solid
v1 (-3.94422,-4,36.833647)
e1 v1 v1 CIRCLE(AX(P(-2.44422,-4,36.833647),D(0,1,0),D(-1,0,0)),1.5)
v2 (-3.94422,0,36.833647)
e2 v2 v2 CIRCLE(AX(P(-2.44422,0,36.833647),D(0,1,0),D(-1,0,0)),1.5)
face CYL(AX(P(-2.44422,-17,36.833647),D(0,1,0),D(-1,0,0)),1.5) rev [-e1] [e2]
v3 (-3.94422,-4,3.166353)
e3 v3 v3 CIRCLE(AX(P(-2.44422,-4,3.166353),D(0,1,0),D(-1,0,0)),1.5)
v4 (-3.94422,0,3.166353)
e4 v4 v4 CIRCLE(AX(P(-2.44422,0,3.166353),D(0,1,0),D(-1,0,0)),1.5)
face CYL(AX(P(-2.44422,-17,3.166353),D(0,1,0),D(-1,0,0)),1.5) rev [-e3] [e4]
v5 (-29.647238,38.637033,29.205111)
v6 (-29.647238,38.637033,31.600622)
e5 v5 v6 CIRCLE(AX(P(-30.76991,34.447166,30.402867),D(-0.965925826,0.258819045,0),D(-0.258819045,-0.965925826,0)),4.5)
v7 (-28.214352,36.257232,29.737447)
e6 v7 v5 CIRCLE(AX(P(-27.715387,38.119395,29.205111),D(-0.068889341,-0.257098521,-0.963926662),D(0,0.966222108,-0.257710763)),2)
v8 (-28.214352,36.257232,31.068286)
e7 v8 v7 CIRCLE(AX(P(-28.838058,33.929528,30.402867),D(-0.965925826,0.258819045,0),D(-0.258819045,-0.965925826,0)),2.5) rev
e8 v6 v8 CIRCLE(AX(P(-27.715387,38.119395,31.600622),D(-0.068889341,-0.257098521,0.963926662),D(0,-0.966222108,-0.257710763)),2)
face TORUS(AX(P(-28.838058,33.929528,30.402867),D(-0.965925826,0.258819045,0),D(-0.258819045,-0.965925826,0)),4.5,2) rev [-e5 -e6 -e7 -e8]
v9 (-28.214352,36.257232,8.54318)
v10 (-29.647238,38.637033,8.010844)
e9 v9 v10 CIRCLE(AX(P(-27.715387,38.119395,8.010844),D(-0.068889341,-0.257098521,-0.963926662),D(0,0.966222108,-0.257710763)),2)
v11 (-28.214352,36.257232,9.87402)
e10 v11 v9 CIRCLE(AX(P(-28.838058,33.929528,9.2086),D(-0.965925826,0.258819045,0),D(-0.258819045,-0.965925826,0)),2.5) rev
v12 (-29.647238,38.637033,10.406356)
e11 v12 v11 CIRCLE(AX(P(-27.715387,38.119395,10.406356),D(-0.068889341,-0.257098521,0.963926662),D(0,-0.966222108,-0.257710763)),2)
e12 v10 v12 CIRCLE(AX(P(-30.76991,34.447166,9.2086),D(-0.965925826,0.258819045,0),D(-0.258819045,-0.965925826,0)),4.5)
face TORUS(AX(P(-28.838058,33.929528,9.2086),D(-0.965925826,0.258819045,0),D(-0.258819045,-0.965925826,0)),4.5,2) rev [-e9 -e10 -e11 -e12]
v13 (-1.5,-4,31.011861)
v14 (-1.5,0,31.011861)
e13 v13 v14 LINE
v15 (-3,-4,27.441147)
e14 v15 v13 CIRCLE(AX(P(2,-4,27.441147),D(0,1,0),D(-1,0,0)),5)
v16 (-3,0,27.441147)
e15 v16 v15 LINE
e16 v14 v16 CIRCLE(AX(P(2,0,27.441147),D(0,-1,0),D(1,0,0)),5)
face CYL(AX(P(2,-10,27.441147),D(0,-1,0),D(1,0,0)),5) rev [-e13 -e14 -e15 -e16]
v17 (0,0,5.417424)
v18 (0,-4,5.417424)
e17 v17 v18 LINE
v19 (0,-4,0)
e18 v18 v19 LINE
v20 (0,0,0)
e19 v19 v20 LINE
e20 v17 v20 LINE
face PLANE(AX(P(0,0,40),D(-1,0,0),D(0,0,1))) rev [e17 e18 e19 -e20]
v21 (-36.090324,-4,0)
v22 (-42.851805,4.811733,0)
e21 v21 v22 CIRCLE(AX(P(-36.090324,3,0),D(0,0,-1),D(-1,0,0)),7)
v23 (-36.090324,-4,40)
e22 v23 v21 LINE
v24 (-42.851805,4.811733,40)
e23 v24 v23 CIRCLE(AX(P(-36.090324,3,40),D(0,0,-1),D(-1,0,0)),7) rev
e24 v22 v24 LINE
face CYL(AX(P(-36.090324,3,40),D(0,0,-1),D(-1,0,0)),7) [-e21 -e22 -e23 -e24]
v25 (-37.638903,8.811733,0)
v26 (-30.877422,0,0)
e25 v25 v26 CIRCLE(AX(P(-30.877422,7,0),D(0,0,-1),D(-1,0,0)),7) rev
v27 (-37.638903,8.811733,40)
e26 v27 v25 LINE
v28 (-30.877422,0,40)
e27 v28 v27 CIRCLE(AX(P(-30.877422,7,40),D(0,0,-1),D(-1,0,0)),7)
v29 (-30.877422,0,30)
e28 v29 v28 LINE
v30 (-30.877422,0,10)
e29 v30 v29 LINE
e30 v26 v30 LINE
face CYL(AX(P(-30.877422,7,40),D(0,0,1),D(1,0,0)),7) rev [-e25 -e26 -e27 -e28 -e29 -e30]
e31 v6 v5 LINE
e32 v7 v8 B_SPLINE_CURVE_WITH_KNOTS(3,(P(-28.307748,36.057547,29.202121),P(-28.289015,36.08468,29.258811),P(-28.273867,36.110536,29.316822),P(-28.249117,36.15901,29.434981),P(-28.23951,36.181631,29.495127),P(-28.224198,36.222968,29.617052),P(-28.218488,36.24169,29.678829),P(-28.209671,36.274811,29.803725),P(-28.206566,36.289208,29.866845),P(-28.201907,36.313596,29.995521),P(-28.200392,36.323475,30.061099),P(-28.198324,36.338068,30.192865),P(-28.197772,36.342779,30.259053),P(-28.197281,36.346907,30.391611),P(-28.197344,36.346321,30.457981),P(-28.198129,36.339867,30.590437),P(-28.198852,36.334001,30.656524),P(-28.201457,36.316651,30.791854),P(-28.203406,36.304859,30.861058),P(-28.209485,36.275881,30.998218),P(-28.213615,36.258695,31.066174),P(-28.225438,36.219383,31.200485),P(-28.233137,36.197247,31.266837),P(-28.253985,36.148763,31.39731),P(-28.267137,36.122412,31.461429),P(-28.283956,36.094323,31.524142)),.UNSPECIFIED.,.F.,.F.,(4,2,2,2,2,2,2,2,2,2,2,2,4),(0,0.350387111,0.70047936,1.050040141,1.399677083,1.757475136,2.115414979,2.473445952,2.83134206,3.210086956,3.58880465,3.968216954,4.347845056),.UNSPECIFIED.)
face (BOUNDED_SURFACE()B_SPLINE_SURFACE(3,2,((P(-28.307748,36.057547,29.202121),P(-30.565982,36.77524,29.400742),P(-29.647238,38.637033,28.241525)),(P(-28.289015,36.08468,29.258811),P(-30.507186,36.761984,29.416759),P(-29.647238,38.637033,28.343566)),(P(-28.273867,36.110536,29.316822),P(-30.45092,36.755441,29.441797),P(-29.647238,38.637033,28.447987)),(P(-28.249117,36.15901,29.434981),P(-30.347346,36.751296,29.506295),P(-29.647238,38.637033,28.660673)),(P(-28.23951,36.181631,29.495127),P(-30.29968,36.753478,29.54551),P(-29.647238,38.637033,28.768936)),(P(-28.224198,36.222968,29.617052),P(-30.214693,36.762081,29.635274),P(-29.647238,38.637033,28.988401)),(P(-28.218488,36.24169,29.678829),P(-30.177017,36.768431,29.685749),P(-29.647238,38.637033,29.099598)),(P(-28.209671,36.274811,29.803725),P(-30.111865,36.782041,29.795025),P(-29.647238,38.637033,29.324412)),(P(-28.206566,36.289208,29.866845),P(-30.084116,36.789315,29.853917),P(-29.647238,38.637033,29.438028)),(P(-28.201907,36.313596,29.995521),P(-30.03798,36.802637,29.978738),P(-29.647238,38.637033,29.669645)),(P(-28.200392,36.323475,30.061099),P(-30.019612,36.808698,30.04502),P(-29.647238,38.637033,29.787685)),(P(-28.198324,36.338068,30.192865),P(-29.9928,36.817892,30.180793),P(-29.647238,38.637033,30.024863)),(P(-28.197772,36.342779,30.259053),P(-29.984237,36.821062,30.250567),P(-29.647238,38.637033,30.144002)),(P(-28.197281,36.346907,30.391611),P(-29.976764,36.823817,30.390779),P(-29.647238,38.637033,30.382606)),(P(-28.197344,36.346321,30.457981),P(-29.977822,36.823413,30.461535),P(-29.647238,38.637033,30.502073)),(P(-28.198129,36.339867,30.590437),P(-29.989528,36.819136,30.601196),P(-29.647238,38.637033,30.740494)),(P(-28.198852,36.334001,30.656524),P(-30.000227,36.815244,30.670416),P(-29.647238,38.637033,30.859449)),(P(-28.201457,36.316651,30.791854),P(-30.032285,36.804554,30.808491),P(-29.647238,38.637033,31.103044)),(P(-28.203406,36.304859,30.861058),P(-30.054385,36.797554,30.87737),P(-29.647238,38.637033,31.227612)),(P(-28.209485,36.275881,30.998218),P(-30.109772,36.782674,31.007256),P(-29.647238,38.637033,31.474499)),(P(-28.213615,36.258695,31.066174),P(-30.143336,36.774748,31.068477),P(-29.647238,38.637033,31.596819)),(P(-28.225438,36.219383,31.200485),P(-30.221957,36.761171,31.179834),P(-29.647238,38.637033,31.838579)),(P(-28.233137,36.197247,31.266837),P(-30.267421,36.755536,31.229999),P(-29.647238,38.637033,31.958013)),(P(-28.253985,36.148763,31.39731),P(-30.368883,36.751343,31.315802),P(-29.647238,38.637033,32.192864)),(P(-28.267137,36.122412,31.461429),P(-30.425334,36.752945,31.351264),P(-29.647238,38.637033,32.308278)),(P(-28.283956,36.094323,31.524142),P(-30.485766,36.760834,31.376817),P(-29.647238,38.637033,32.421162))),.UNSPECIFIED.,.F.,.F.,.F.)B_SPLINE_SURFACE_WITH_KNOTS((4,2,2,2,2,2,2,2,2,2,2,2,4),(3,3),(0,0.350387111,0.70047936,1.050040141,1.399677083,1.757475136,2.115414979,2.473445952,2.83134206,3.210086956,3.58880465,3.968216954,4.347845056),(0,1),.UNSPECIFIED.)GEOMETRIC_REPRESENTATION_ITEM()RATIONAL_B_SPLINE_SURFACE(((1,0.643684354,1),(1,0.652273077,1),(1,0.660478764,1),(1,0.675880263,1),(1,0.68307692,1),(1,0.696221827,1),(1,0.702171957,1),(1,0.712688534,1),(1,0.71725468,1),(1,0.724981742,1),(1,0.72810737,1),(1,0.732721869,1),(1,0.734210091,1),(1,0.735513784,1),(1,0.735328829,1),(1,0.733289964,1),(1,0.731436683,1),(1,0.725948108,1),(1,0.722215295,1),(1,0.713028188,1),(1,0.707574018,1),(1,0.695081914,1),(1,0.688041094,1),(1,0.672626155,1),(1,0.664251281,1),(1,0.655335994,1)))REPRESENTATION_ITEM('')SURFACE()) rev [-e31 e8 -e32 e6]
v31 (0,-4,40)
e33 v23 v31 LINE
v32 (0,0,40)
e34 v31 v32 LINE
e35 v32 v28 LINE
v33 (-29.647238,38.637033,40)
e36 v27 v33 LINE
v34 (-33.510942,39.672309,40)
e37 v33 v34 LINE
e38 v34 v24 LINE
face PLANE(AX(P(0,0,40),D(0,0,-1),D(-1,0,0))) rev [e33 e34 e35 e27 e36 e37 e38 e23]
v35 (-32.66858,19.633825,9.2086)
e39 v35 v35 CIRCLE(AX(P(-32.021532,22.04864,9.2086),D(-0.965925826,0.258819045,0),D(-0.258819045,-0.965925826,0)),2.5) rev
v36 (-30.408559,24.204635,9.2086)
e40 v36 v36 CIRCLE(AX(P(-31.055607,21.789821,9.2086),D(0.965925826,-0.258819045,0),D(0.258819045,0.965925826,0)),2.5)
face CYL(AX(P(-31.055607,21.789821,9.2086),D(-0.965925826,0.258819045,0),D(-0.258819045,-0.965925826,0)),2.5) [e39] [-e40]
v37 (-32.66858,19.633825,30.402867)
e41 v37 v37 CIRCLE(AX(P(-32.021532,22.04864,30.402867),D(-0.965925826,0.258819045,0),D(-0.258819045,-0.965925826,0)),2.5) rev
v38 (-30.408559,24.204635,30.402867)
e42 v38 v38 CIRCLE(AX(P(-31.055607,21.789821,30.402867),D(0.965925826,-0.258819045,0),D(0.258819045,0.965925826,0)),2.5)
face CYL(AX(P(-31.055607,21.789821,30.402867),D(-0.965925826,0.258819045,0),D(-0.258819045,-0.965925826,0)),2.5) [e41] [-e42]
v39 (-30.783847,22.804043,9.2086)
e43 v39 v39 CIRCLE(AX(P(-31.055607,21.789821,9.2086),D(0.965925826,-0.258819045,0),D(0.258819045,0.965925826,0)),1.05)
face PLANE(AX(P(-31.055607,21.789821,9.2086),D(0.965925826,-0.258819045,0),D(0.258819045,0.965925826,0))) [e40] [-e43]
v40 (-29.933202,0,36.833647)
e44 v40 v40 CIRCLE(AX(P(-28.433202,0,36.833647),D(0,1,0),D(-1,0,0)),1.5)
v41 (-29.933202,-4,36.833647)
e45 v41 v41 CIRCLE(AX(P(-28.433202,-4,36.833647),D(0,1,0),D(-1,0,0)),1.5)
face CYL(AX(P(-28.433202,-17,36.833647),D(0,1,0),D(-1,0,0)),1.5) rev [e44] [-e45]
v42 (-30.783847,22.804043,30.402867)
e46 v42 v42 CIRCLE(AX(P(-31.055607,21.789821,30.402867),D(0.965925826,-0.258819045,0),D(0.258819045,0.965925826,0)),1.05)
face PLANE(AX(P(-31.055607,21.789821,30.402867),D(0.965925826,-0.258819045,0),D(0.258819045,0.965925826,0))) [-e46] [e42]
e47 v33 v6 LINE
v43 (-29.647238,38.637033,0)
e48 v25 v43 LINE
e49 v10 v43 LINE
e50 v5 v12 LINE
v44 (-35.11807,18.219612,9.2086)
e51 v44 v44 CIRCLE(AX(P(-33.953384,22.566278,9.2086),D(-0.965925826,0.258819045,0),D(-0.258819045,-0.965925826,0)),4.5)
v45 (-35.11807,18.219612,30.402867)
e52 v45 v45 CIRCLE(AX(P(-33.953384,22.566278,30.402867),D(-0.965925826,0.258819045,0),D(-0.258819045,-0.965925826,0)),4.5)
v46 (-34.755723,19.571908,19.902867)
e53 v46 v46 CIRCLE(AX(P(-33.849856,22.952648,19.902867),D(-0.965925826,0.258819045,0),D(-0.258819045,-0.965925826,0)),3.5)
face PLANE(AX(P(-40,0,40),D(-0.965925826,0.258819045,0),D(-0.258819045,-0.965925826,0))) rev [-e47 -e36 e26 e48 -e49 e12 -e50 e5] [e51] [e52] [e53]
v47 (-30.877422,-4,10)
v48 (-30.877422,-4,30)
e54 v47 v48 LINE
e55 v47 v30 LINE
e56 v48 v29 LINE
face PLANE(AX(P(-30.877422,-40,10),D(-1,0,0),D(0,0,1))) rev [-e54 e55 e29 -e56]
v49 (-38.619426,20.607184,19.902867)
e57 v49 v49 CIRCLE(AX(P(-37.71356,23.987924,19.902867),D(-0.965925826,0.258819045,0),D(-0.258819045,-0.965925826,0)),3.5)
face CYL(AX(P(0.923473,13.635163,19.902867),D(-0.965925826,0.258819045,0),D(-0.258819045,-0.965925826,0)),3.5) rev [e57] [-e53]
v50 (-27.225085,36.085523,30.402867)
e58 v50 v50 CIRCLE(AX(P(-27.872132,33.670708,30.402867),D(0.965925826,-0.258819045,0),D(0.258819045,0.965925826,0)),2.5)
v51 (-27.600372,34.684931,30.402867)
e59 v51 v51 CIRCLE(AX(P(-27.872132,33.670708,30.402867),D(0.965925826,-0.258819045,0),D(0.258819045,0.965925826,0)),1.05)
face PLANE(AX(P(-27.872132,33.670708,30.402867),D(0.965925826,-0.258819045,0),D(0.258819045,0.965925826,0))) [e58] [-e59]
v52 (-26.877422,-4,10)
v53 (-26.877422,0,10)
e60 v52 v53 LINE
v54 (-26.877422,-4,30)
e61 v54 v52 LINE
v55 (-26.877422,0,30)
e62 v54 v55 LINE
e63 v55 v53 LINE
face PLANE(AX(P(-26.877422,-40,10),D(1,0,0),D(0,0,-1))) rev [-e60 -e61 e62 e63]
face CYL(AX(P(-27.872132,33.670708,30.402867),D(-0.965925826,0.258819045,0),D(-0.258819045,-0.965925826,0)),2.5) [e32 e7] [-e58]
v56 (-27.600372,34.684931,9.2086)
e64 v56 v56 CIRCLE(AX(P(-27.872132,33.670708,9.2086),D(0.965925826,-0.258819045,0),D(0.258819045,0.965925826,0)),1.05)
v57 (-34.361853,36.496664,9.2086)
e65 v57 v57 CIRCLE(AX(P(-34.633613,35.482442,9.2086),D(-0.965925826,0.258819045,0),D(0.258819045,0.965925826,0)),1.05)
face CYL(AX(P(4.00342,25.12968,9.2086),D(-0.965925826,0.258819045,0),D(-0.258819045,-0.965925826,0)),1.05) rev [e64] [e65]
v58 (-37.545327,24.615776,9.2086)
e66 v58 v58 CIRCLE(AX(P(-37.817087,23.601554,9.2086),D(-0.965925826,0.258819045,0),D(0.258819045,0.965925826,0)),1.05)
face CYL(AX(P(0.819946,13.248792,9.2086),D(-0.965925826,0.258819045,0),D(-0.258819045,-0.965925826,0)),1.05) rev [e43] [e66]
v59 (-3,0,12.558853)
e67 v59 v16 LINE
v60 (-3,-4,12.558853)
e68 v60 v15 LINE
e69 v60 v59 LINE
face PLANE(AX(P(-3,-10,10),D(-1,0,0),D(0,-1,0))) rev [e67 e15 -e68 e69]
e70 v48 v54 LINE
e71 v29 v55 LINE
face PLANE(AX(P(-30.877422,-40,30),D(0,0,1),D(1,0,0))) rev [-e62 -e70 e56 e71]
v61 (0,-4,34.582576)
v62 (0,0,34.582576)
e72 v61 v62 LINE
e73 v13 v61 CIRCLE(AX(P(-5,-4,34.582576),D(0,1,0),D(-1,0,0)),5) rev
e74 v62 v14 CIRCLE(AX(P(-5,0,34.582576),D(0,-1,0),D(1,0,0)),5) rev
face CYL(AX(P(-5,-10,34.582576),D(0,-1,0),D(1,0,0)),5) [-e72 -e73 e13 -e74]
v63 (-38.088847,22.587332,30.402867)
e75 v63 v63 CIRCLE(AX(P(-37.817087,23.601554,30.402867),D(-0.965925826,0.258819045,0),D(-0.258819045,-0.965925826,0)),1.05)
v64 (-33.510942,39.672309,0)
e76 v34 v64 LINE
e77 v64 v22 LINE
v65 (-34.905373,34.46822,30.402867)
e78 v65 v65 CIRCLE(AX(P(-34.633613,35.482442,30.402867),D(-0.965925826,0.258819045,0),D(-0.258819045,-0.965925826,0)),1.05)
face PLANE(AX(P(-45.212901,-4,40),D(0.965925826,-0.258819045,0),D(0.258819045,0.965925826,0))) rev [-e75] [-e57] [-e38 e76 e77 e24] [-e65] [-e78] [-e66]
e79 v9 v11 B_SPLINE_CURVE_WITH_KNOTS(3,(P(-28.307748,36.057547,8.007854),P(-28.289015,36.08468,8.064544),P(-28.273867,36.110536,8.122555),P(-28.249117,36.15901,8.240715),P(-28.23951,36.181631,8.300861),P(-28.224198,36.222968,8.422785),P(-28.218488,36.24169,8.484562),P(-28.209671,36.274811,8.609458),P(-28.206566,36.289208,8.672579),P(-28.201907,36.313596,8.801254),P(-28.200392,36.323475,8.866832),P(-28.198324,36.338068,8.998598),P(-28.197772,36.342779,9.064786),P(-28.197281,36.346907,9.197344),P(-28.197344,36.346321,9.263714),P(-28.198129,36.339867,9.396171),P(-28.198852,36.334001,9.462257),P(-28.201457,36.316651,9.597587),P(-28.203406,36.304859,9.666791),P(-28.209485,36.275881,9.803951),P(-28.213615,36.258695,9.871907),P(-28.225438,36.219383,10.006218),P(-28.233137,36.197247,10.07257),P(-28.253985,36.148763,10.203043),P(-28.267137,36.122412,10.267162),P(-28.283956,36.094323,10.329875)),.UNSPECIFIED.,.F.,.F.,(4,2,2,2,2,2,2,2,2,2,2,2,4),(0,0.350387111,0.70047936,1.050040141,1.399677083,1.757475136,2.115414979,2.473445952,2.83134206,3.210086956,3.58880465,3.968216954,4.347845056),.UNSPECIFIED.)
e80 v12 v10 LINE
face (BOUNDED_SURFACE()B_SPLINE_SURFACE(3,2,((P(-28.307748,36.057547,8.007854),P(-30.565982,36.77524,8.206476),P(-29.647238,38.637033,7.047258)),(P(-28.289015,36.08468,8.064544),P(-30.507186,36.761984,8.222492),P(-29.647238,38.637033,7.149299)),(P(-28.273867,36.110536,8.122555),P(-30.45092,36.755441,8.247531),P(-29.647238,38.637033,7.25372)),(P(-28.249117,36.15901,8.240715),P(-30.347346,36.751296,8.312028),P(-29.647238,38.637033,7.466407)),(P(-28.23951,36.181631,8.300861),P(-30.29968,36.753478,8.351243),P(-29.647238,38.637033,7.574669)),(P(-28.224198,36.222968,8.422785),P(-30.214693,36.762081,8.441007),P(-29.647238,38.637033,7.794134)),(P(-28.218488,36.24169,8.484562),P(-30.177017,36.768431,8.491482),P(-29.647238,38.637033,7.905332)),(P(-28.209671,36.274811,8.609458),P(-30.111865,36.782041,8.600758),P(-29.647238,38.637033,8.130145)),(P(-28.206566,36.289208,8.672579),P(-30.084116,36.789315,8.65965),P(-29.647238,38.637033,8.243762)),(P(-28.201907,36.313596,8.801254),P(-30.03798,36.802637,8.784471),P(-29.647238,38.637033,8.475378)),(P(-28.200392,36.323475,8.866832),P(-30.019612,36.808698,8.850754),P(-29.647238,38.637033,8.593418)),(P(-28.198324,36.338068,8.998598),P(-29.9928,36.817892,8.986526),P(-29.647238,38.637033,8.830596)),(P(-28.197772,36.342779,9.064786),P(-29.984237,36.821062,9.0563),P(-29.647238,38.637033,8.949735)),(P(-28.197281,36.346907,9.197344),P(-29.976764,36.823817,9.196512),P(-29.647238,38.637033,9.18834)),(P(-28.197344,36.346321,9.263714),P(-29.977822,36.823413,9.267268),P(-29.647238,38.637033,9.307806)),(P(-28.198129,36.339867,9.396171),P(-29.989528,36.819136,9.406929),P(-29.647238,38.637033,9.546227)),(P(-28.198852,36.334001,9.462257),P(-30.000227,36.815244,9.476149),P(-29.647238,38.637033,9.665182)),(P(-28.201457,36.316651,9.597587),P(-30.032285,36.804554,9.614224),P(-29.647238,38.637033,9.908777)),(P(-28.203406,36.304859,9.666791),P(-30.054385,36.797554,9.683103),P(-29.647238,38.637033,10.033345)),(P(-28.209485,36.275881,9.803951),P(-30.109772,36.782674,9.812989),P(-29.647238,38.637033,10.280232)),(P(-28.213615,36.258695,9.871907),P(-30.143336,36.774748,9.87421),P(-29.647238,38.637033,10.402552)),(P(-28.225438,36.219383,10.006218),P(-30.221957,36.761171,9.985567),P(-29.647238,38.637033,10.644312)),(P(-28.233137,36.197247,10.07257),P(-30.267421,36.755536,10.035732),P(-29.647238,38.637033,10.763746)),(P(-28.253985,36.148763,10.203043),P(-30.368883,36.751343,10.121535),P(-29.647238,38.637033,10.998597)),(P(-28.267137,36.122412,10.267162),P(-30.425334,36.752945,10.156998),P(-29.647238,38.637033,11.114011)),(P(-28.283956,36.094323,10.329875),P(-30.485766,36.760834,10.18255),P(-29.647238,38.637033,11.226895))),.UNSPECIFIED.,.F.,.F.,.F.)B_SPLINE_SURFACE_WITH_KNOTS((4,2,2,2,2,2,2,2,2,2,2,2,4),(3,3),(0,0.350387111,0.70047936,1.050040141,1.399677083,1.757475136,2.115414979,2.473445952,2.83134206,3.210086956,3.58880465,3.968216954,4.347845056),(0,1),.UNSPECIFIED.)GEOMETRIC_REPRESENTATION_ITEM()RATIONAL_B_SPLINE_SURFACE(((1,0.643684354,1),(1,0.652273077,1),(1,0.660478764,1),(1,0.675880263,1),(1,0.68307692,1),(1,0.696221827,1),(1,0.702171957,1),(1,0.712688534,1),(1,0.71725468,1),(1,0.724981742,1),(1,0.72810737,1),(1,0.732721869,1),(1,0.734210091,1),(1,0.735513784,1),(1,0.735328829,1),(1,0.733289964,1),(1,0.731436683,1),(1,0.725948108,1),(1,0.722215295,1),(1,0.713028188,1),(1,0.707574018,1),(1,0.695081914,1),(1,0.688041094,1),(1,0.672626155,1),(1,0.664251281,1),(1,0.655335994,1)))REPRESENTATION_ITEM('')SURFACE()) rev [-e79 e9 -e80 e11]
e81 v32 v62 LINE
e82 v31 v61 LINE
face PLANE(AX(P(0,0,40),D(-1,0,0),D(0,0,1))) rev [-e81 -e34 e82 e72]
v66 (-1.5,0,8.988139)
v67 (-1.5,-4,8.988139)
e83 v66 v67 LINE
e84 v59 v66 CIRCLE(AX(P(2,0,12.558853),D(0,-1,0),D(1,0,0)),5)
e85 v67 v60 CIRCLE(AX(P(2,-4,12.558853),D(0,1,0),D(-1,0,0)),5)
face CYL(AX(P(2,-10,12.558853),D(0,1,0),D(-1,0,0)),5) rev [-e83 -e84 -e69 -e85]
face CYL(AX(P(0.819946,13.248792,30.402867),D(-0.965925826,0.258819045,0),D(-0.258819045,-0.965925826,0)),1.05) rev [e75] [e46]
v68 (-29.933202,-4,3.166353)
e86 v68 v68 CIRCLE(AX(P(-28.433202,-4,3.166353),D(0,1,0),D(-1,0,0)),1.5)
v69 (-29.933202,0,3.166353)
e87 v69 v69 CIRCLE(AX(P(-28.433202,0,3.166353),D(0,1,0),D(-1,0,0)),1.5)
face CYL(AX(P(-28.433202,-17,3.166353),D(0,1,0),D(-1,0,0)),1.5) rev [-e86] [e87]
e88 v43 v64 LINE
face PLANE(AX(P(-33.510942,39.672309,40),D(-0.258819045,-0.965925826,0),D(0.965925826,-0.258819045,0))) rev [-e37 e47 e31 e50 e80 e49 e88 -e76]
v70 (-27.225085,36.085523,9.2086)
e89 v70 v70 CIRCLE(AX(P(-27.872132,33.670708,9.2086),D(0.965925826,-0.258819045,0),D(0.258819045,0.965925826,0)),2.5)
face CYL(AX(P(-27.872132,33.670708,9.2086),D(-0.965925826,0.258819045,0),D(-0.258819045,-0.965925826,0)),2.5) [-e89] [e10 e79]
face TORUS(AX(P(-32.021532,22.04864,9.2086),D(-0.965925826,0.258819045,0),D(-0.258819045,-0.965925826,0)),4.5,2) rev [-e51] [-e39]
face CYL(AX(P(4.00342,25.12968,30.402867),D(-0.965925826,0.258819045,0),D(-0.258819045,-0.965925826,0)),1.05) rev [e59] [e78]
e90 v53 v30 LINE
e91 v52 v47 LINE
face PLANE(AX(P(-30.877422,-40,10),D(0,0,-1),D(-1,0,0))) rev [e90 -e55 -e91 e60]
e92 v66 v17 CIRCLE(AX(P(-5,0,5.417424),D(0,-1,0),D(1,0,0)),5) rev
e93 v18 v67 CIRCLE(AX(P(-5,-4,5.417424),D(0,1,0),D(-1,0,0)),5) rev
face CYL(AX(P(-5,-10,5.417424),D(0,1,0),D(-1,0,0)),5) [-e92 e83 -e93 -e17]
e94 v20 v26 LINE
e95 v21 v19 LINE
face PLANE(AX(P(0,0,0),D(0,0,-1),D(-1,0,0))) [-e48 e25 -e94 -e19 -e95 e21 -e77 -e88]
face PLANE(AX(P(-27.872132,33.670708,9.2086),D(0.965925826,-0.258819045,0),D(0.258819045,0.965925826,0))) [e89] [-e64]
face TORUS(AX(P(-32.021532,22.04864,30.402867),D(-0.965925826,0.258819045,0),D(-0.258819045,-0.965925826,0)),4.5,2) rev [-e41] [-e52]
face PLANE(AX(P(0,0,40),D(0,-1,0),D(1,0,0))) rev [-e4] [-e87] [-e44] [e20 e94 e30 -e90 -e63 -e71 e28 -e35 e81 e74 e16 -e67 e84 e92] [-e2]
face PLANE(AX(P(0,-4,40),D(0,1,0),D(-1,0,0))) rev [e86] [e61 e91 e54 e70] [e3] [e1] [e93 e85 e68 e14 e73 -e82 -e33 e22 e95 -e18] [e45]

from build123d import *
from build123d.topology import SkipClean

# Parameters (mm, degrees)
ESTRUSIONE_ESTRUSIONE1_DEPTH = 40
RACCORDO1_R                  = 7
SCHIZZO2_W                   = 4
SCHIZZO2_H                   = 20
TAGLIO_ESTRUSIONE1_DEPTH     = 40
SCHIZZO3_R                   = 1.05
SCHIZZO3_R_2                 = 3.5
TAGLIO_ESTRUSIONE2_DEPTH     = 40
SCHIZZO4_R                   = 2.5
SCHIZZO4_R_2                 = 1.05
ESTRUSIONE_ESTRUSIONE2_DEPTH = 3
RACCORDO2_R                  = 2
SCHIZZO5_R                   = 1.5
TAGLIO_ESTRUSIONE3_DEPTH     = 17
TAGLIO_ESTRUSIONE4_DEPTH     = 10
RACCORDO3_R                  = 5
RACCORDO4_R                  = 5


with BuildPart() as part:
    # Schizzo1 → Estrusione-Estrusione1 (new body)
    with BuildSketch(Plane.XY):
        Polygon((0, 0), (-40, 0), (-29.647238196, 38.637033052), (-33.510941501, 39.672309232), (-45.212901491, -4), (0, -4), align=None)
    extrude(amount=ESTRUSIONE_ESTRUSIONE1_DEPTH)

    # Raccordo1
    raccordo1_edges = [part.edges().sort_by_distance(p)[0] for p in [
        (-45.212901491, -4, 20),
        (-40, 0, 20),
    ]]
    fillet(raccordo1_edges, radius=RACCORDO1_R)

    # Schizzo2 → Taglio-Estrusione1 (cut)
    with BuildSketch(Plane(origin=(0, 0, 0), x_dir=(1, 0, 0), z_dir=(0, 1, 0))):
        with Locations((-28.87742239, -20)):
            Rectangle(SCHIZZO2_W, SCHIZZO2_H)
    extrude(amount=-TAGLIO_ESTRUSIONE1_DEPTH, mode=Mode.SUBTRACT)

    # Schizzo3 → Taglio-Estrusione2 (cut)
    with BuildSketch(Plane(origin=(-41.184211381, 11.03527618, 0), x_dir=(0, 0, 1), z_dir=(-0.9659258262890673, 0.2588190451025247, 0))):
        with Locations(Location((30.402866557, 25.309568218, 0), (0, 0, 270))):
            Circle(SCHIZZO3_R)
        with Locations(Location((9.20859967, 25.309568218, 0), (0, 0, 270))):
            Circle(SCHIZZO3_R)
        with Locations(Location((30.402866557, 13.009568218, 0), (0, 0, 270))):
            Circle(SCHIZZO3_R)
        with Locations(Location((9.20859967, 13.009568218, 0), (0, 0, 270))):
            Circle(SCHIZZO3_R)
        with Locations(Location((19.902866557, 13.409568216, 0), (0, 0, 270))):
            Circle(SCHIZZO3_R_2)
    extrude(amount=-TAGLIO_ESTRUSIONE2_DEPTH, mode=Mode.SUBTRACT)

    # Schizzo4 → Estrusione-Estrusione2 (add)
    # profile 1 of 4: a face of its own
    with SkipClean():  # the faces are left unmerged after this step: merging them gives an invalid solid
        with BuildSketch(Plane(origin=(-37.320508076, 10, 0), x_dir=(0, 0, -1), z_dir=(0.9659258262890674, -0.2588190451025245, 0))):
            with Locations(Location((-9.20859967, 13.009568218, 0), (0, 0, 270))):
                Circle(SCHIZZO4_R)
            with Locations(Location((-9.20859967, 13.009568218, 0), (0, 0, 90))):
                Circle(SCHIZZO4_R_2, mode=Mode.SUBTRACT)
        # profile 2 of 4: a face of its own
        with BuildSketch(Plane(origin=(-37.320508076, 10, 0), x_dir=(0, 0, -1), z_dir=(0.9659258262890674, -0.2588190451025245, 0))):
            with Locations(Location((-30.402866557, 13.009568218, 0), (0, 0, 270))):
                Circle(SCHIZZO4_R)
            with Locations(Location((-30.402866557, 13.009568218, 0), (0, 0, 270))):
                Circle(SCHIZZO4_R_2, mode=Mode.SUBTRACT)
        # profile 3 of 4: a face of its own
        with BuildSketch(Plane(origin=(-37.320508076, 10, 0), x_dir=(0, 0, -1), z_dir=(0.9659258262890674, -0.2588190451025245, 0))):
            with Locations(Location((-30.402866557, 25.309568218, 0), (0, 0, 270))):
                Circle(SCHIZZO4_R)
            with Locations(Location((-30.402866557, 25.309568218, 0), (0, 0, 270))):
                Circle(SCHIZZO4_R_2, mode=Mode.SUBTRACT)
        # profile 4 of 4: a face of its own
        with BuildSketch(Plane(origin=(-37.320508076, 10, 0), x_dir=(0, 0, -1), z_dir=(0.9659258262890674, -0.2588190451025245, 0))):
            with Locations(Location((-9.20859967, 25.309568218, 0), (0, 0, 270))):
                Circle(SCHIZZO4_R)
            with Locations(Location((-9.20859967, 25.309568218, 0), (0, 0, 90))):
                Circle(SCHIZZO4_R_2, mode=Mode.SUBTRACT)
        extrude(amount=ESTRUSIONE_ESTRUSIONE2_DEPTH)
    add(part.part.scale(1), mode=Mode.REPLACE)  # the faces are merged on a copy

    # Raccordo2
    raccordo2_edges = [part.edges().sort_by_distance(p)[0] for p in [
        (-33.306336439, 24.981092497, 9.20859967),
        (-33.306336439, 24.981092497, 30.402866557),
        (-30.122862185, 36.86198016, 30.402866557),
        (-30.122862185, 36.86198016, 9.20859967),
    ]]
    fillet(raccordo2_edges, radius=RACCORDO2_R)

    # Schizzo5 → Taglio-Estrusione3 (cut)
    with BuildSketch(Plane(origin=(0, 0, 0), x_dir=(1, 0, 0), z_dir=(0, 1, 0))):
        with Locations(Location((-2.444220089, -36.8336475, 0), (0, 0, 180))):
            Circle(SCHIZZO5_R)
        with Locations(Location((-2.444220089, -3.1663525, 0), (0, 0, 180))):
            Circle(SCHIZZO5_R)
        with Locations(Location((-28.433202301, -3.1663525, 0), (0, 0, 180))):
            Circle(SCHIZZO5_R)
        with Locations(Location((-28.433202301, -36.8336475, 0), (0, 0, 180))):
            Circle(SCHIZZO5_R)
    extrude(amount=-TAGLIO_ESTRUSIONE3_DEPTH, mode=Mode.SUBTRACT)

    # Schizzo6 → Taglio-Estrusione4 (cut)
    with BuildSketch(Plane(origin=(0, 0, 0), x_dir=(1, 0, 0), z_dir=(0, 1, 0))):
        Polygon((0, -20), (0, -30), (-3, -30), (-3, -10), (0, -10), align=None)
    extrude(amount=-TAGLIO_ESTRUSIONE4_DEPTH, mode=Mode.SUBTRACT)

    # Raccordo3
    # the kernel refuses this fillet: 5 mm, written as the material it takes off along each edge
    with BuildSketch(Plane(origin=(0, 11.456439237, 10), x_dir=(0, 0, -1), z_dir=(0, -1, 0))) as raccordo3_piece_1:
        with BuildLine():
            CenterArc((4.582575695, -5), RACCORDO3_R, 90, 66.421821522)
            Line((0, -3), (-0.091651514, -2.96))
            ThreePointArc((-0.091651514, -2.96), (-0.1, -1.5), (-0.1, 0))
            Line((-0.1, 0), (0, 0.1))
            Line((0, 0.1), (4.582575695, 0.1))
            Line((4.582575695, 0.1), (4.582575695, 0))
        make_face()
    extrude(amount=26.912878475, mode=Mode.SUBTRACT)
    with BuildSketch(Plane(origin=(0, 11.456439237, 30), x_dir=(0, 0, 1), z_dir=(0, -1, 0))) as raccordo3_piece_2:
        with BuildLine():
            CenterArc((4.582575695, 5), RACCORDO3_R, 203.578178478, 66.421821522)
            Line((0, 3), (-0.091651514, 2.96))
            ThreePointArc((-0.091651514, 2.96), (-0.1, 1.5), (-0.1, 0))
            Line((-0.1, 0), (0, -0.1))
            Line((0, -0.1), (4.582575695, -0.1))
            Line((4.582575695, -0.1), (4.582575695, 0))
        make_face()
    extrude(amount=26.912878475, mode=Mode.SUBTRACT)

    # Raccordo4
    raccordo4_edges = [part.edges().sort_by_distance(p)[0] for p in [
        (-3, -2, 30),
        (-3, -2, 10),
    ]]
    fillet(raccordo4_edges, radius=RACCORDO4_R)


solid = part.part
